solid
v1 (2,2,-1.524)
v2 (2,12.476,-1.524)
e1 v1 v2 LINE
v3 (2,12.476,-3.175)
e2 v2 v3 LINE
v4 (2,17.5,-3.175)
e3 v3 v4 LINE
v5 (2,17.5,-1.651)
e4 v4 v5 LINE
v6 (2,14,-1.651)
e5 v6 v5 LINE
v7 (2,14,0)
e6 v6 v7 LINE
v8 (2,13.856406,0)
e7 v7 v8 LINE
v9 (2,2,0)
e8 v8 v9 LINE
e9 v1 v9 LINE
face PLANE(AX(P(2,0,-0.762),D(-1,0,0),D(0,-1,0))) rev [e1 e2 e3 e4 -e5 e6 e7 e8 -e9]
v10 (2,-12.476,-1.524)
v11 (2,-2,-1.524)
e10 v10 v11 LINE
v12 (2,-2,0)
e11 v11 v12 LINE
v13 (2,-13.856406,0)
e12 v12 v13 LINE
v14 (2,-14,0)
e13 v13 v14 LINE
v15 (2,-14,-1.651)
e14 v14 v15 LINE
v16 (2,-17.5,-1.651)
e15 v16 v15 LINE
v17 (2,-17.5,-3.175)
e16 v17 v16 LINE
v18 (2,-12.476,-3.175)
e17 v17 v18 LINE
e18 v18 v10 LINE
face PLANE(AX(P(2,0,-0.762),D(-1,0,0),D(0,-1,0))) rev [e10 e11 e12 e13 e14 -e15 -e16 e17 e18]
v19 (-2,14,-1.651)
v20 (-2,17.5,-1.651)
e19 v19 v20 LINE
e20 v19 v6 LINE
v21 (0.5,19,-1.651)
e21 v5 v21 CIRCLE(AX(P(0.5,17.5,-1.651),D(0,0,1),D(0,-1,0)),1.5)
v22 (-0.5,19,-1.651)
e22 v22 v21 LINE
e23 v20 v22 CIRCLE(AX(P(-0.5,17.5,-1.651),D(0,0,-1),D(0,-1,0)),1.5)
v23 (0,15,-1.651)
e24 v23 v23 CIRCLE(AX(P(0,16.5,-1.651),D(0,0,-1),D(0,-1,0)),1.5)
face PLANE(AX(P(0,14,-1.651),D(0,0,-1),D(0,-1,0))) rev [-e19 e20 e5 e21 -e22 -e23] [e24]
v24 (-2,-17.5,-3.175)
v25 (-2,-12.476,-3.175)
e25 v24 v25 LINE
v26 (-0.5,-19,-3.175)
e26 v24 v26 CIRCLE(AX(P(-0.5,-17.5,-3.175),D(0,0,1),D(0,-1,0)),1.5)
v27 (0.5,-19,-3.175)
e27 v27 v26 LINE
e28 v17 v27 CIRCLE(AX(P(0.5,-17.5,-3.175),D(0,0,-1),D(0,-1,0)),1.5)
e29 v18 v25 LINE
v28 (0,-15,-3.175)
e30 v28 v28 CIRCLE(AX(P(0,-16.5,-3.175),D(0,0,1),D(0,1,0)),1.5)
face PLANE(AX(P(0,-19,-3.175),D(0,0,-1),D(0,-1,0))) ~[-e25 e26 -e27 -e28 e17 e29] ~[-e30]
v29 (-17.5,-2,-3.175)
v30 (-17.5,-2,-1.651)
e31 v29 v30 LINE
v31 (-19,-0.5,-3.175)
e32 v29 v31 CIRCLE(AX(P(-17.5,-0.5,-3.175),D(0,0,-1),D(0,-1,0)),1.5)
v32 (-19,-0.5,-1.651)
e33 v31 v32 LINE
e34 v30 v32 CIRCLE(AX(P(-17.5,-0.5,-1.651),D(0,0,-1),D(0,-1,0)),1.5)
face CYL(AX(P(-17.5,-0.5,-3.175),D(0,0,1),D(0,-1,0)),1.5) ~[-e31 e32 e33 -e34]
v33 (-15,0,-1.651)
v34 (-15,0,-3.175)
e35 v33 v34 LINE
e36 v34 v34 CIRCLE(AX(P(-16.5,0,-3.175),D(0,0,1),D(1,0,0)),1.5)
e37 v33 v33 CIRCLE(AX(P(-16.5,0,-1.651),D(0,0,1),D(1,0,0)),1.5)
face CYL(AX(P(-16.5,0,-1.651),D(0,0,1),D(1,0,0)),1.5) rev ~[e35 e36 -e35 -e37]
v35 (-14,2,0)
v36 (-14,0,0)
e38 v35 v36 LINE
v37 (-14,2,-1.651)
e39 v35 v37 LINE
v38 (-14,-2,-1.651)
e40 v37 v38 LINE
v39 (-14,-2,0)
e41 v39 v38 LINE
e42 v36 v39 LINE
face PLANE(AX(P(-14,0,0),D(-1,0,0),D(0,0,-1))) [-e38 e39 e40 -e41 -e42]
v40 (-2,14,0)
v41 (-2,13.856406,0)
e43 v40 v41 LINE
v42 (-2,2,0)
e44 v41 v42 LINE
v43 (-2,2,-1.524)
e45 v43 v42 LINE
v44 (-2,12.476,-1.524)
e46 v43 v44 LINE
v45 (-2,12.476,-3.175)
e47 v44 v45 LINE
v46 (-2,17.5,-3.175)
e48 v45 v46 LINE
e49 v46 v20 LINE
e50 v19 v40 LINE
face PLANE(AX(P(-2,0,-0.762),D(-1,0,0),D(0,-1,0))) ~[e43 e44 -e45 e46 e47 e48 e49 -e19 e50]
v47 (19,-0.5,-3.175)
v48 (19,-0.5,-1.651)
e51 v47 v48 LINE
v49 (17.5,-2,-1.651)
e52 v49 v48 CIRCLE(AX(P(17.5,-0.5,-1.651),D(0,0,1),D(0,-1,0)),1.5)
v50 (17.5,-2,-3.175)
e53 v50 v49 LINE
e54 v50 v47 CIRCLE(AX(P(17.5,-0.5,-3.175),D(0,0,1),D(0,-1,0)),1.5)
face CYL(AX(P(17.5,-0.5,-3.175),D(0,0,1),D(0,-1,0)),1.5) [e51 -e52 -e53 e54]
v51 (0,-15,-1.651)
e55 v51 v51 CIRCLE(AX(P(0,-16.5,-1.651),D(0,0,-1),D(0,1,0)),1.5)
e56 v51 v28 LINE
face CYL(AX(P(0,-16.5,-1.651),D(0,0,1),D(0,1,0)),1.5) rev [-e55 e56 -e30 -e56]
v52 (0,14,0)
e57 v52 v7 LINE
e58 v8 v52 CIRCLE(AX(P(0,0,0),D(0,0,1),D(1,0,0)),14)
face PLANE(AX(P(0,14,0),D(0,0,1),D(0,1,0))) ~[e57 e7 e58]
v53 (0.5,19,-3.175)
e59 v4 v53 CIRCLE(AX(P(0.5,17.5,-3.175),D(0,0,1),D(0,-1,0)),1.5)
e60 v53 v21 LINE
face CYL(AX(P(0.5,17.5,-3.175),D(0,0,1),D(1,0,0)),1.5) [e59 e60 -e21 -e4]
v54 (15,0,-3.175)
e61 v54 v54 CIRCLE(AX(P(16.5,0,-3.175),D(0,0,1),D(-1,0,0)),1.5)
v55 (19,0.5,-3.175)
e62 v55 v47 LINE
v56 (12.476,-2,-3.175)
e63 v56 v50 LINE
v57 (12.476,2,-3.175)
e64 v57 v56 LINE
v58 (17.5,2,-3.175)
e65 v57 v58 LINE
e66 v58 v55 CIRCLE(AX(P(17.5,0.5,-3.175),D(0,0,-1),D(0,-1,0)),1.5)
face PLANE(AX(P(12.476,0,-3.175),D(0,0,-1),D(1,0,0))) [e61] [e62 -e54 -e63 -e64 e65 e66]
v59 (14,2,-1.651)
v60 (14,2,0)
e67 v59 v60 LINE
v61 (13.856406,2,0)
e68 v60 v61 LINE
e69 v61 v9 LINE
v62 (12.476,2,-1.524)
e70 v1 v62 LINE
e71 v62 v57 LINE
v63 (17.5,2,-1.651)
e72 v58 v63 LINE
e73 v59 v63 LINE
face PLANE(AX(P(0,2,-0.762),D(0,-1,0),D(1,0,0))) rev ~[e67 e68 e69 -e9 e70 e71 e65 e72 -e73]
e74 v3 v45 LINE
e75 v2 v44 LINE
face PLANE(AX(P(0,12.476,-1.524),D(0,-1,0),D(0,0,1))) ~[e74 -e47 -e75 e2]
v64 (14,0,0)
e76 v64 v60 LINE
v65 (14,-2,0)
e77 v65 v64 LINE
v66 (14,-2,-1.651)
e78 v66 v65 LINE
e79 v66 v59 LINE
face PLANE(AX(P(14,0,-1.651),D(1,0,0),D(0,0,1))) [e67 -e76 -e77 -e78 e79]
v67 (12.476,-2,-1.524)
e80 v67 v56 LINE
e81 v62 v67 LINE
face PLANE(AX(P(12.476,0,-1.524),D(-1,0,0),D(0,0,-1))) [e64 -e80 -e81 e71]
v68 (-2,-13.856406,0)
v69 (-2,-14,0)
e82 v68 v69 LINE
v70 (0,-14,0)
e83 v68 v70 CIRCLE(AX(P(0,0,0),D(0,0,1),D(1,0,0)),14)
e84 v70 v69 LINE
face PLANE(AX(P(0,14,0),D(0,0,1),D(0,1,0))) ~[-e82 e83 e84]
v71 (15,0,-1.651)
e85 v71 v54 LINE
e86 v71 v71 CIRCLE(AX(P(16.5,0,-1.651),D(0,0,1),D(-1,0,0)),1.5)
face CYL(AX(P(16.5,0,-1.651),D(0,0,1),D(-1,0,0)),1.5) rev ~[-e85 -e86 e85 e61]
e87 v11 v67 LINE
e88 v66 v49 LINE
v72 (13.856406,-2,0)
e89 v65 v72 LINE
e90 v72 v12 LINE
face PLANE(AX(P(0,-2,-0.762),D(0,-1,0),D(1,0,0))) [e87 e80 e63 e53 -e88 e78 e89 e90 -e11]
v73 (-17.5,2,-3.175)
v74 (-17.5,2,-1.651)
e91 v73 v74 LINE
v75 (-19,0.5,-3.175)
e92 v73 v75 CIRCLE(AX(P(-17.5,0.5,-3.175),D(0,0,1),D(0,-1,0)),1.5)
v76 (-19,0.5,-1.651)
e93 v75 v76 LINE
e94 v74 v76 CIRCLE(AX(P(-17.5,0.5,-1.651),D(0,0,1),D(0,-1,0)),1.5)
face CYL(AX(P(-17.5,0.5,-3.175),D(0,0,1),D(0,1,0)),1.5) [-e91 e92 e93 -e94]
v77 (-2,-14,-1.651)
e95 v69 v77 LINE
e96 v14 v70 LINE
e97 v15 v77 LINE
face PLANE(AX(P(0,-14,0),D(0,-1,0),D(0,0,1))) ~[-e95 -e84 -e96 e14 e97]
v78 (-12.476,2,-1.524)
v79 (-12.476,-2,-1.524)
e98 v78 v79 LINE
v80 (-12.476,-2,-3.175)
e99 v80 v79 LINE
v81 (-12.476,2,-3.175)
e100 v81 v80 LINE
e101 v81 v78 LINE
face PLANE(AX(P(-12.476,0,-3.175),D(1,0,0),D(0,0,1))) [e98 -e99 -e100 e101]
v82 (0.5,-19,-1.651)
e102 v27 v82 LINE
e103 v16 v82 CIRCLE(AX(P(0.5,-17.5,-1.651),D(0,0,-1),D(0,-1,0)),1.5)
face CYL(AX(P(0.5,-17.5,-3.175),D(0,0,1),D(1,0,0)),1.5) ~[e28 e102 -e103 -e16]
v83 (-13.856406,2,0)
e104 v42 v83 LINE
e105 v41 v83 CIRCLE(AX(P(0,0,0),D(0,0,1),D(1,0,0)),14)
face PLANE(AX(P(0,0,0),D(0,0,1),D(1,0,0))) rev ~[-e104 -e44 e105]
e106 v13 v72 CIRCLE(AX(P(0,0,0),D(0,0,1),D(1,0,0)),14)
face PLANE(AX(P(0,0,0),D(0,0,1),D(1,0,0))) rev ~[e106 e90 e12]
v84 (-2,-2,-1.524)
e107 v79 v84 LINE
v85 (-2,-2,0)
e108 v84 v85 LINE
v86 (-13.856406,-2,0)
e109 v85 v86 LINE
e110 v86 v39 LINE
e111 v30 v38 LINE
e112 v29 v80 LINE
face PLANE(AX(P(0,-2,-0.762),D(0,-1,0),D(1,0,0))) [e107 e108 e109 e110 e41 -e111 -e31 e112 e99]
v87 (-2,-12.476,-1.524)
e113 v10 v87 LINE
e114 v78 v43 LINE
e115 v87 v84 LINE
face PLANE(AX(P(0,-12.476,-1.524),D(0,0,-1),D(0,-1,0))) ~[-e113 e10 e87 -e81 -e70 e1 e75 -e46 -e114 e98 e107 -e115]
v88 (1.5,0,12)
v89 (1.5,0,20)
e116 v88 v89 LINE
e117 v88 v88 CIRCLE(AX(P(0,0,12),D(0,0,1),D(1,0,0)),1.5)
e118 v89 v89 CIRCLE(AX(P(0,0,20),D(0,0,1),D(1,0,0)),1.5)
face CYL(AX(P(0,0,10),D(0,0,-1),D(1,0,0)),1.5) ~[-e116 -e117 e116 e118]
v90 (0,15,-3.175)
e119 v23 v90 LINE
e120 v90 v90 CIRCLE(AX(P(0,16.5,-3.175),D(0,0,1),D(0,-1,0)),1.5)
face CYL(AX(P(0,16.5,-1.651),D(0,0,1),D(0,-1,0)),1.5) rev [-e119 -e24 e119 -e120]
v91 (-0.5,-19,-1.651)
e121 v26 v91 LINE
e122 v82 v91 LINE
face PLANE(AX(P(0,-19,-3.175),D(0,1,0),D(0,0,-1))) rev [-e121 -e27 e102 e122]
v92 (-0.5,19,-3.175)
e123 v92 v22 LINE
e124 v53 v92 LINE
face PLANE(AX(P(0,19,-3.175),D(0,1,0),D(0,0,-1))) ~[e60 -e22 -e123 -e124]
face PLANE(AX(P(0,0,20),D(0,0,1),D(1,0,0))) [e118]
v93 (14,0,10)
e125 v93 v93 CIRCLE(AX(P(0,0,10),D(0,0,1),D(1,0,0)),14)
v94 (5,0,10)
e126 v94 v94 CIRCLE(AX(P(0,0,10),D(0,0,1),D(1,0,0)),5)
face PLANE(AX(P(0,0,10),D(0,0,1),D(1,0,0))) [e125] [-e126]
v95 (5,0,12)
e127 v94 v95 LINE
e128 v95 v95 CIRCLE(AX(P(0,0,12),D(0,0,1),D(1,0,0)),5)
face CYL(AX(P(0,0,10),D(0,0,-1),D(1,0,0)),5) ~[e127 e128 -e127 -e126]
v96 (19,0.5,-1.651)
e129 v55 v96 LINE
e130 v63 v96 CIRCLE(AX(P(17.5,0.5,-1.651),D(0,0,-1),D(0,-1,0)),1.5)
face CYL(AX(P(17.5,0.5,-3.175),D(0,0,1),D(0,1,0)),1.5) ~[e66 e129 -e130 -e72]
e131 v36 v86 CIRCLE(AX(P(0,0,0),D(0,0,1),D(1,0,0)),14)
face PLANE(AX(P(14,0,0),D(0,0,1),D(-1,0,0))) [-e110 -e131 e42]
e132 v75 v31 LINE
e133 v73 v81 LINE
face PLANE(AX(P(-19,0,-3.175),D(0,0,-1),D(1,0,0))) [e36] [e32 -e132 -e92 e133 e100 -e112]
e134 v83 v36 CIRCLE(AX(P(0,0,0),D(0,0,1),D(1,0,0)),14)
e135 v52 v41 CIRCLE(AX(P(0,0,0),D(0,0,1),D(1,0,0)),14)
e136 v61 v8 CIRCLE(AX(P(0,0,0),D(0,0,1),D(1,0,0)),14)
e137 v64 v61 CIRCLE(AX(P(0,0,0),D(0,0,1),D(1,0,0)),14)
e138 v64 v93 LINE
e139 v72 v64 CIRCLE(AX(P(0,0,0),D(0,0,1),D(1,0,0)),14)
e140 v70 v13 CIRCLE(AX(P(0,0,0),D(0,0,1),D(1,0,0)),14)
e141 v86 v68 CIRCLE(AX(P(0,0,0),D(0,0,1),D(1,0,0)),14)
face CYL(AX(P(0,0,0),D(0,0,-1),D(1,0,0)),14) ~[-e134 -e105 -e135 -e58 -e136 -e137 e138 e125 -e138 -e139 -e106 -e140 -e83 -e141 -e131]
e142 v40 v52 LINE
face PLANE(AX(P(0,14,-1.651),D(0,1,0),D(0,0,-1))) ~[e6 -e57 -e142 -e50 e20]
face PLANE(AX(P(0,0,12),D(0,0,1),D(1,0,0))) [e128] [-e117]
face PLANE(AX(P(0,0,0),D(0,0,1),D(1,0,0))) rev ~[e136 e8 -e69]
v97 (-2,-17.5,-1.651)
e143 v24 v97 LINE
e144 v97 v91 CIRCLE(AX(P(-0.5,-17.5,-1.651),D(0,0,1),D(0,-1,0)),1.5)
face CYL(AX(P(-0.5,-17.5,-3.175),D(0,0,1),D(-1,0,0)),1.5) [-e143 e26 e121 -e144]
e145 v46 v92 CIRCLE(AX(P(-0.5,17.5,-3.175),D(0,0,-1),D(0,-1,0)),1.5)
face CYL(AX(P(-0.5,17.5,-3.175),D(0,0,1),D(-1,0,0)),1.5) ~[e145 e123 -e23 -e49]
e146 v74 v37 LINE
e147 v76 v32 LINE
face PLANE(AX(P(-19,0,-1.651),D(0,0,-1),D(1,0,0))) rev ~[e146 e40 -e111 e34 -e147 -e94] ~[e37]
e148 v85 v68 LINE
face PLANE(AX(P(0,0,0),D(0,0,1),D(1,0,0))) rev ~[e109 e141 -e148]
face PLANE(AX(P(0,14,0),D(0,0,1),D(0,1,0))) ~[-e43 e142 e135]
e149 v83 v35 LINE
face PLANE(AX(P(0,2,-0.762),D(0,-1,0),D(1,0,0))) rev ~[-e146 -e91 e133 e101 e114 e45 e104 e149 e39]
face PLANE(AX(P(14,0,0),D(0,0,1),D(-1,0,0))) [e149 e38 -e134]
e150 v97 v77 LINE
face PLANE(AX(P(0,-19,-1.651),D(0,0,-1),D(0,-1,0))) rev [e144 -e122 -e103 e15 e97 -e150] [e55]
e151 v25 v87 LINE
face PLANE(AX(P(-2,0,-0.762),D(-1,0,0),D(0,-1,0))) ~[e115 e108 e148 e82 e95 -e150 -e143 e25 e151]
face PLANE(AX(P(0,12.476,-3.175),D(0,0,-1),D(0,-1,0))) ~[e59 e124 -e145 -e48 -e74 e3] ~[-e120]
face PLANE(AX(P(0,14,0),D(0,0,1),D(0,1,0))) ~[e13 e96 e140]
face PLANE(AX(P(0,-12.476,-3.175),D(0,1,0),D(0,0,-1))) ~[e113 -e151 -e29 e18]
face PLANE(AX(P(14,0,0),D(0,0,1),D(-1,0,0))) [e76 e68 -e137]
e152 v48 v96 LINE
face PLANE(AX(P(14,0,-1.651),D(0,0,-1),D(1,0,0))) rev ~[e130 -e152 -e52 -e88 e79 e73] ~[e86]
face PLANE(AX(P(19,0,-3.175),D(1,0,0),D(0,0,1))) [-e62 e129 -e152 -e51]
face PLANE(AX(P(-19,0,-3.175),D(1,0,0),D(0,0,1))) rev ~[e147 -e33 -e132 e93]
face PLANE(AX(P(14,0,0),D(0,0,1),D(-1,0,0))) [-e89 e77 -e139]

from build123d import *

# Parameters (mm, degrees)
F0_R     = 14
F1_DEPTH = 10
F2_R     = 5
F2_R_2   = 1.5
F3_DEPTH = 2
F4_DEPTH = 10
F5_W     = 5
F5_H     = 1.524
F6_DEPTH = 2
F7_R     = 1.5
F8_DEPTH = 25.4
F9_R     = 1.5


# Not quite as in the source:
# - a pattern or mirror of a feature is missing from the dataset's text; its kind, count and spacing are read off the source's solid


with BuildPart() as f1:
    # F0 (on Top) → F1 (new body)
    with BuildSketch(Plane.XY):
        Circle(F0_R)
    extrude(amount=F1_DEPTH)

    # F2 (on face) → F3 (join)
    with BuildSketch(Plane.XY.offset(10)):
        Circle(F2_R)
        Circle(F2_R_2, mode=Mode.SUBTRACT)
    extrude(amount=F3_DEPTH)

    # F4 (add): a face of the model
    f4_faces = [f1.faces().sort_by_distance(p)[0] for p in [
        (0, 0, 10),
    ]]
    extrude(f4_faces, amount=F4_DEPTH)

    # F5 (on Front) → F6 (join, symmetric)
    with BuildSketch(Plane.XZ):
        Polygon((14, 0), (-14, 0), (-14, -1.524), (-12.476, -1.524), (12.476, -1.524), (14, -1.524), align=None)
        Polygon((-12.476, -1.524), (-14, -1.524), (-14, -1.651), (-14, -3.175), (-12.476, -3.175), align=None)
        with Locations((-16.5, -2.413)):
            Rectangle(F5_W, F5_H)
        Polygon((14, -1.651), (14, -1.524), (12.476, -1.524), (12.476, -3.175), (14, -3.175), align=None)
        with Locations((16.5, -2.413)):
            Rectangle(F5_W, F5_H)
    f6 = extrude(amount=F6_DEPTH, both=True)

    # F6_copies: F6 across plane
    add(f6.mirror(Plane(origin=(0, 0, 0), x_dir=(-0.7071067812, -0.7071067812, 0), z_dir=(-0.7071067812, 0.7071067812, 0))))

    # F7 (on face) → F8 (cut)
    with BuildSketch(Plane.XY.offset(-1.651)):
        with Locations((-16.5, 0)):
            Circle(F7_R)
        with BuildLine():
            ThreePointArc((18, 0), (16.5, 1.5), (15, 0))
            ThreePointArc((15, 0), (16.5, -1.5), (18, 0))
        make_face()
    f8 = extrude(amount=-F8_DEPTH, mode=Mode.SUBTRACT)

    # F8_copies: F8 across plane
    add(f8.mirror(Plane(origin=(0, 0, 0), x_dir=(0.7071067812, 0.7071067812, 0), z_dir=(0.7071067812, -0.7071067812, 0))), mode=Mode.SUBTRACT)

    # F9
    f9_edges = [f1.edges().sort_by_distance(p)[0] for p in [
        (-19, -2, -2.413),
        (-19, 2, -2.413),
        (19, -2, -2.413),
        (19, 2, -2.413),
        (2, 19, -2.413),
        (-2, 19, -2.413),
        (-2, -19, -2.413),
        (2, -19, -2.413),
    ]]
    fillet(f9_edges, radius=F9_R)


solid = f1.part
